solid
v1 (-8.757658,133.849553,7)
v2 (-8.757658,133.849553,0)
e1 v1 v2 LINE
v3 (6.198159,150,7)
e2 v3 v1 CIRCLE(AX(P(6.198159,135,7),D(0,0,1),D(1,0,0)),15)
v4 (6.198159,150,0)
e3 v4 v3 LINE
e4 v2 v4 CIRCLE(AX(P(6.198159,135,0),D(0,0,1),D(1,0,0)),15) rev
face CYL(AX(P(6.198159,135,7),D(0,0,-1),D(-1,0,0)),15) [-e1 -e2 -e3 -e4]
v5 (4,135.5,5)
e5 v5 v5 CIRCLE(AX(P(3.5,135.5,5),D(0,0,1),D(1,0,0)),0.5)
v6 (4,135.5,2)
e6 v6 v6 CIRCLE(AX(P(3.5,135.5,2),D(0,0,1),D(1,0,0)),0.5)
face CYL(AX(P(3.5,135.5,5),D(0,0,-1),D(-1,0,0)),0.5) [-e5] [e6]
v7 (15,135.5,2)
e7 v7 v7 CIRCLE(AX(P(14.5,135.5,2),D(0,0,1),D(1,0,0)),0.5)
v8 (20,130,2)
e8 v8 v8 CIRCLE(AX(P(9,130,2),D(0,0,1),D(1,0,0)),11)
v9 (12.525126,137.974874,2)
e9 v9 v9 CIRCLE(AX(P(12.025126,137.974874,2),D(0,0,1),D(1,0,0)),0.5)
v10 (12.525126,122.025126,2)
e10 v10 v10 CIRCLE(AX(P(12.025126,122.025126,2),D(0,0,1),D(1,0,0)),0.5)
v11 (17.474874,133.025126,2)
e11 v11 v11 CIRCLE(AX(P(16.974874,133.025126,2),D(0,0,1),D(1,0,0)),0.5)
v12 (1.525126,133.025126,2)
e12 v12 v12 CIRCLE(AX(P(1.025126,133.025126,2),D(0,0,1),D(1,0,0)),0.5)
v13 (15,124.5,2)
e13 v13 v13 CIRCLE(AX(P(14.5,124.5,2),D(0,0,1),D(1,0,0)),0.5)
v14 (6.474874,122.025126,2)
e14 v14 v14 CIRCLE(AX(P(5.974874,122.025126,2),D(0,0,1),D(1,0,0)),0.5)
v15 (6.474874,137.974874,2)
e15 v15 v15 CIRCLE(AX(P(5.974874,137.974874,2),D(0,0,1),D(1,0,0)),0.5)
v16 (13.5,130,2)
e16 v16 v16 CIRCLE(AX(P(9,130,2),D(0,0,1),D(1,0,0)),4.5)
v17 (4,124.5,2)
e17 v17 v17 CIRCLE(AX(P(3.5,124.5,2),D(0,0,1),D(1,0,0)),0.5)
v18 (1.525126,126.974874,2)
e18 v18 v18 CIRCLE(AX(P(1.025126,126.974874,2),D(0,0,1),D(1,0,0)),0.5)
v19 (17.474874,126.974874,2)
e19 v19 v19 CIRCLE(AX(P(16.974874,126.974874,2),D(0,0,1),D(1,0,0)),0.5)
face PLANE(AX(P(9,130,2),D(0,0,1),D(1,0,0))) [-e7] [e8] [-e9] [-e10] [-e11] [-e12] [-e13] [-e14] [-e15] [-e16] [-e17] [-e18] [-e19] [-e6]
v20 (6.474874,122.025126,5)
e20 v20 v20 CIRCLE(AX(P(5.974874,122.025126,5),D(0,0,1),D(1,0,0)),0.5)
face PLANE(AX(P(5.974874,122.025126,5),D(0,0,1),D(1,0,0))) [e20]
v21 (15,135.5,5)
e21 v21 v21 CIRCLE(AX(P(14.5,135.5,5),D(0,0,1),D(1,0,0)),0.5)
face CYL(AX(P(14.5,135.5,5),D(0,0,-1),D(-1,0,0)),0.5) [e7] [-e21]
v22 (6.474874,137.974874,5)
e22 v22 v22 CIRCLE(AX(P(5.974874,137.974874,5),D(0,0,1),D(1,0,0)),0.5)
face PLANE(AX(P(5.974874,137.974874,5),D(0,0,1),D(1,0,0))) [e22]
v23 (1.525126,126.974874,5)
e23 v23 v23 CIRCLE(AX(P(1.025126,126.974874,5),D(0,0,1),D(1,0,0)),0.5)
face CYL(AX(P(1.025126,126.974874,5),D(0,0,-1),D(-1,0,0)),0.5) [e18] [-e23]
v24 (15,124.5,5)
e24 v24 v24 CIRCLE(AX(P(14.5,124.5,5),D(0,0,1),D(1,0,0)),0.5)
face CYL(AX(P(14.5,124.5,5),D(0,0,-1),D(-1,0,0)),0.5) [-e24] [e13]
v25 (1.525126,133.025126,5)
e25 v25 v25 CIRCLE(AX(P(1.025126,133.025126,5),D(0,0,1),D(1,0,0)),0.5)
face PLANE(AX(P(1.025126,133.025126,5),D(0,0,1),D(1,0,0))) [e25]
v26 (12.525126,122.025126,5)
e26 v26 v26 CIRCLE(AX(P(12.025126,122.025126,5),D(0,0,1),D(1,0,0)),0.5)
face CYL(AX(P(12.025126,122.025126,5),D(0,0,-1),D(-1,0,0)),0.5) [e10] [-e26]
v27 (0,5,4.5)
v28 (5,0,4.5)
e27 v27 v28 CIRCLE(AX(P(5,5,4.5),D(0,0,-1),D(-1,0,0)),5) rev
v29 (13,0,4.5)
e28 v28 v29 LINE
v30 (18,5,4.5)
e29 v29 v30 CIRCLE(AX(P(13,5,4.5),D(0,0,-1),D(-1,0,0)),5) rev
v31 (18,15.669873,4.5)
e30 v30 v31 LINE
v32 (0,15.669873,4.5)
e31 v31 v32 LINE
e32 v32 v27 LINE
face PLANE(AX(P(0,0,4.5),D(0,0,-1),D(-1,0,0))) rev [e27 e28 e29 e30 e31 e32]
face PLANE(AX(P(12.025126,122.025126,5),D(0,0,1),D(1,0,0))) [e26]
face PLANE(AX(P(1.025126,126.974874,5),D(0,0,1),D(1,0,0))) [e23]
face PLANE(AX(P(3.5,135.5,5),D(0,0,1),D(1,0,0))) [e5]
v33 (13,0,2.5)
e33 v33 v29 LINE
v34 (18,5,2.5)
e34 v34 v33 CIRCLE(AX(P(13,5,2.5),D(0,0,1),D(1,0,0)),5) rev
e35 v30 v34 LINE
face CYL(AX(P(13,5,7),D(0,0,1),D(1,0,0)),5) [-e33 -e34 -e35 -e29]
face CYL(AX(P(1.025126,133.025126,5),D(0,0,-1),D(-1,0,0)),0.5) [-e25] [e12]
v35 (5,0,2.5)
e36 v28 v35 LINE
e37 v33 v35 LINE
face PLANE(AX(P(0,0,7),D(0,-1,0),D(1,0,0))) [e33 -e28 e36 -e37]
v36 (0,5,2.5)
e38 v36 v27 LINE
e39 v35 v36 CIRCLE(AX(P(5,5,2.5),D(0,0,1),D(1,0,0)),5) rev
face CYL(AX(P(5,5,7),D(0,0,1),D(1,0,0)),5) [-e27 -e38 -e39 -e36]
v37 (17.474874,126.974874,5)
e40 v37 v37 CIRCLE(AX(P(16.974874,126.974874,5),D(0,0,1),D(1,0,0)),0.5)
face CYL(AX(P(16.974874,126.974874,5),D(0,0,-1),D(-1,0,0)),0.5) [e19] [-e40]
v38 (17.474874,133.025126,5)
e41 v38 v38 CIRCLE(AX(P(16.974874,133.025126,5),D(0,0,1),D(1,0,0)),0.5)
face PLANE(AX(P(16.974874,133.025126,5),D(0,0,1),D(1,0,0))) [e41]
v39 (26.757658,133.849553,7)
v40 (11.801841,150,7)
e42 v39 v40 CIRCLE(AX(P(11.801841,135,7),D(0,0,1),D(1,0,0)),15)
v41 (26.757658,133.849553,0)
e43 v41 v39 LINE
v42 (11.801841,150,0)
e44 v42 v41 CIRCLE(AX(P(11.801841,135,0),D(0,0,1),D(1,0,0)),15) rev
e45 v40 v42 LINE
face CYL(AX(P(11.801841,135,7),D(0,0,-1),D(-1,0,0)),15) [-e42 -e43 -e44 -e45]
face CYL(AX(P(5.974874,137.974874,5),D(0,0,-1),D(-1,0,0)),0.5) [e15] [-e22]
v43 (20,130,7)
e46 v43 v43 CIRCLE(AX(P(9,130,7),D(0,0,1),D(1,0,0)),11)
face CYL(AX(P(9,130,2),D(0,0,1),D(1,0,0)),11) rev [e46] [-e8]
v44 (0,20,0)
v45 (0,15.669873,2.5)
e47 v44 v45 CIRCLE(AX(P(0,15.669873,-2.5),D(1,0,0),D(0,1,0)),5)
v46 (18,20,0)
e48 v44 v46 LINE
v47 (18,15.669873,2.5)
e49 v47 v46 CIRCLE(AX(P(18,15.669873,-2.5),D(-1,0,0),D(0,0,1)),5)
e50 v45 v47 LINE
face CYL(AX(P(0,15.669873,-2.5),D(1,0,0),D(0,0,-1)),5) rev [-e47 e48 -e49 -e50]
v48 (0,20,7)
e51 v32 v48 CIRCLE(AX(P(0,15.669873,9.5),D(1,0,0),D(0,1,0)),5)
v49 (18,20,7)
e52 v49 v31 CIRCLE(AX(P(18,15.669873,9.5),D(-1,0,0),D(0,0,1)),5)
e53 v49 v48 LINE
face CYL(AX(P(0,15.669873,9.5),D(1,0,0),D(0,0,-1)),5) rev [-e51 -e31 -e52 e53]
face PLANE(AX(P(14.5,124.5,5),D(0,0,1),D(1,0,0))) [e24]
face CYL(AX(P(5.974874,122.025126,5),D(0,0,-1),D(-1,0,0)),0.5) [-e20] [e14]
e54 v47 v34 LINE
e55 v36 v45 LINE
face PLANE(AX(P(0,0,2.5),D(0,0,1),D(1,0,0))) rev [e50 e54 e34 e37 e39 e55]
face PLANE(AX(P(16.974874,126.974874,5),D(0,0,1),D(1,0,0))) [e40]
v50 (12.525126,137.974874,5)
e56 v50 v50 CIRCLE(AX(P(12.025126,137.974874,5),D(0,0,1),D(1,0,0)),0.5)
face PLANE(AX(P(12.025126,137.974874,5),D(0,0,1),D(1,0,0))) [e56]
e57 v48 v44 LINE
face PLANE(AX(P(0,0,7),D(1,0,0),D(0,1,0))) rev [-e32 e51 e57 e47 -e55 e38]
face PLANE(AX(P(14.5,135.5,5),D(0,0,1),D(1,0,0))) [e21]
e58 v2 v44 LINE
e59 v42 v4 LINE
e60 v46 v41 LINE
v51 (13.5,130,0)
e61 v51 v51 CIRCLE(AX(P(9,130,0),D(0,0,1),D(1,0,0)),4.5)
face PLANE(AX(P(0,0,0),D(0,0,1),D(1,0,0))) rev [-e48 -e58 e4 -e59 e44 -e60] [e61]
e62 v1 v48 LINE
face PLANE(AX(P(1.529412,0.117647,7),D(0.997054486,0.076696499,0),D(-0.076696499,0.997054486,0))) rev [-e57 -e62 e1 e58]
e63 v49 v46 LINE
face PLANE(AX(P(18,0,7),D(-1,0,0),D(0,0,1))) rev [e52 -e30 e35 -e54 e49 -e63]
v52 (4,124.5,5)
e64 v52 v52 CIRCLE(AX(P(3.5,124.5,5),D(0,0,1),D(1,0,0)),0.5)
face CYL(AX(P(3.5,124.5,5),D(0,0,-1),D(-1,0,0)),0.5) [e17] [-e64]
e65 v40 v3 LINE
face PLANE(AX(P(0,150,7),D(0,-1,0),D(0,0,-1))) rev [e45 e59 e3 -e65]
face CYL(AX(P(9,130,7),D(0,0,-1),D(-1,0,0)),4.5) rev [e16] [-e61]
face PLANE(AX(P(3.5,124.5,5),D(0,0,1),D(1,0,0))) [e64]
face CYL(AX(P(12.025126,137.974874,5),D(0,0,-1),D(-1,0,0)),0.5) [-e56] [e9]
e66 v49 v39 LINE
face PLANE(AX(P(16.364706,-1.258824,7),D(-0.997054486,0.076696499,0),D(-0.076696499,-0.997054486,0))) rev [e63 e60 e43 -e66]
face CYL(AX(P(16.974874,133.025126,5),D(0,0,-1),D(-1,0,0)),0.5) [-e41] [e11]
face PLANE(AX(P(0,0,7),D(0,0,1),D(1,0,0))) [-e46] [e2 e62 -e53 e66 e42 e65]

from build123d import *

# Parameters (mm, degrees)
ESQUISSE1_R             = 4.5
ESQUISSE1_W             = 18
ESQUISSE1_H             = 20
BOSS_EXTRU_1_DEPTH      = 7
ESQUISSE2_R             = 11
ENL_V_MAT_EXTRU_1_DEPTH = 5
ESQUISSE3_R             = 0.5
BOSS_EXTRU_2_DEPTH      = 3
ESQUISSE4_W             = 18
ESQUISSE4_H             = 20
ENL_V_MAT_EXTRU_2_DEPTH = 2.5
ESQUISSE5_W             = 18
ESQUISSE5_H             = 20
ENL_V_MAT_EXTRU_3_DEPTH = 2.5
CONG_1_R                = 5
CONG_2_R                = 15


with BuildPart() as part:
    # Esquisse1 → Boss.-Extru.1 (new body)
    # profile 1 of 2: a face of its own
    with BuildSketch(Plane.XY):
        Polygon((18, 20), (28, 150), (18, 150), (0, 150), (-10, 150), (0, 20), align=None)
        with Locations((9, 130)):
            Circle(ESQUISSE1_R, mode=Mode.SUBTRACT)
    # profile 2 of 2: a face of its own
    with BuildSketch(Plane.XY):
        with Locations((9, 10)):
            Rectangle(ESQUISSE1_W, ESQUISSE1_H)
    extrude(amount=BOSS_EXTRU_1_DEPTH)

    # Esquisse2 → Enlèv. mat.-Extru.1 (cut)
    with BuildSketch(Plane.XY.offset(7)):
        with Locations((9, 130)):
            Circle(ESQUISSE2_R)
    extrude(amount=-ENL_V_MAT_EXTRU_1_DEPTH, mode=Mode.SUBTRACT)

    # Esquisse3 → Boss.-Extru.2 (add)
    with BuildSketch(Plane.XY.offset(2)):
        with Locations((3.5, 135.5)):
            Circle(ESQUISSE3_R)
        with Locations((5.974873734, 137.974873734)):
            Circle(ESQUISSE3_R)
        with Locations((1.025126266, 133.025126266)):
            Circle(ESQUISSE3_R)
        with Locations((1.025126266, 126.974873734)):
            Circle(ESQUISSE3_R)
        with Locations((3.5, 124.5)):
            Circle(ESQUISSE3_R)
        with Locations((5.974873734, 122.025126266)):
            Circle(ESQUISSE3_R)
        with Locations((12.025126266, 122.025126266)):
            Circle(ESQUISSE3_R)
        with Locations((14.5, 124.5)):
            Circle(ESQUISSE3_R)
        with Locations((16.974873734, 126.974873734)):
            Circle(ESQUISSE3_R)
        with Locations((16.974873734, 133.025126266)):
            Circle(ESQUISSE3_R)
        with Locations((14.5, 135.5)):
            Circle(ESQUISSE3_R)
        with Locations((12.025126266, 137.974873734)):
            Circle(ESQUISSE3_R)
    extrude(amount=BOSS_EXTRU_2_DEPTH)

    # Esquisse4 → Enlèv. mat.-Extru.2 (cut)
    with BuildSketch(Plane.XY.offset(7)):
        with Locations((9, 10)):
            Rectangle(ESQUISSE4_W, ESQUISSE4_H)
    extrude(amount=-ENL_V_MAT_EXTRU_2_DEPTH, mode=Mode.SUBTRACT)

    # Esquisse5 → Enlèv. mat.-Extru.3 (cut)
    with BuildSketch(Plane(origin=(0, 0, 0), x_dir=(-1, 0, 0), z_dir=(0, 0, -1))):
        with Locations((-9, 10)):
            Rectangle(ESQUISSE5_W, ESQUISSE5_H)
    extrude(amount=-ENL_V_MAT_EXTRU_3_DEPTH, mode=Mode.SUBTRACT)

    # Congé1
    # the kernel refuses this fillet: 5 mm, written as the material it adds along each edge
    with BuildSketch(Plane(origin=(0, 20, 2.5), x_dir=(0, 0, -1), z_dir=(1, 0, 0)), Plane(origin=(18, 20, 4.5), x_dir=(0, 0, 1), z_dir=(-1, 0, 0))) as cong_1_piece_1:
        with BuildLine():
            CenterArc((5, -4.330127019), CONG_1_R, 120, 60)
            Line((0, -4.330127019), (0, 0))
            Line((0, 0), (2.5, 0))
        make_face()
    extrude(amount=18)
    # the kernel refuses this fillet: 5 mm, written as the material it takes off along each edge
    with BuildSketch(Plane(origin=(18, 0, -10), x_dir=(-1, 0, 0), z_dir=(0, 0, 1)), Plane(origin=(0, 0, -10), x_dir=(0, 1, 0), z_dir=(0, 0, 1))) as cong_1_2_piece_1:
        with BuildLine():
            CenterArc((CONG_1_R, -CONG_1_R), CONG_1_R, 90, 90)
            Line((0, -CONG_1_R), (0, 0))
            Line((0, 0), (CONG_1_R, 0))
        make_face()
    extrude(amount=27, mode=Mode.SUBTRACT)

    # Congé2
    cong_2_edges = [part.edges().sort_by_distance(p)[0] for p in [
        (-10, 150, 3.5),
        (28, 150, 3.5),
    ]]
    fillet(cong_2_edges, radius=CONG_2_R)


solid = part.part
